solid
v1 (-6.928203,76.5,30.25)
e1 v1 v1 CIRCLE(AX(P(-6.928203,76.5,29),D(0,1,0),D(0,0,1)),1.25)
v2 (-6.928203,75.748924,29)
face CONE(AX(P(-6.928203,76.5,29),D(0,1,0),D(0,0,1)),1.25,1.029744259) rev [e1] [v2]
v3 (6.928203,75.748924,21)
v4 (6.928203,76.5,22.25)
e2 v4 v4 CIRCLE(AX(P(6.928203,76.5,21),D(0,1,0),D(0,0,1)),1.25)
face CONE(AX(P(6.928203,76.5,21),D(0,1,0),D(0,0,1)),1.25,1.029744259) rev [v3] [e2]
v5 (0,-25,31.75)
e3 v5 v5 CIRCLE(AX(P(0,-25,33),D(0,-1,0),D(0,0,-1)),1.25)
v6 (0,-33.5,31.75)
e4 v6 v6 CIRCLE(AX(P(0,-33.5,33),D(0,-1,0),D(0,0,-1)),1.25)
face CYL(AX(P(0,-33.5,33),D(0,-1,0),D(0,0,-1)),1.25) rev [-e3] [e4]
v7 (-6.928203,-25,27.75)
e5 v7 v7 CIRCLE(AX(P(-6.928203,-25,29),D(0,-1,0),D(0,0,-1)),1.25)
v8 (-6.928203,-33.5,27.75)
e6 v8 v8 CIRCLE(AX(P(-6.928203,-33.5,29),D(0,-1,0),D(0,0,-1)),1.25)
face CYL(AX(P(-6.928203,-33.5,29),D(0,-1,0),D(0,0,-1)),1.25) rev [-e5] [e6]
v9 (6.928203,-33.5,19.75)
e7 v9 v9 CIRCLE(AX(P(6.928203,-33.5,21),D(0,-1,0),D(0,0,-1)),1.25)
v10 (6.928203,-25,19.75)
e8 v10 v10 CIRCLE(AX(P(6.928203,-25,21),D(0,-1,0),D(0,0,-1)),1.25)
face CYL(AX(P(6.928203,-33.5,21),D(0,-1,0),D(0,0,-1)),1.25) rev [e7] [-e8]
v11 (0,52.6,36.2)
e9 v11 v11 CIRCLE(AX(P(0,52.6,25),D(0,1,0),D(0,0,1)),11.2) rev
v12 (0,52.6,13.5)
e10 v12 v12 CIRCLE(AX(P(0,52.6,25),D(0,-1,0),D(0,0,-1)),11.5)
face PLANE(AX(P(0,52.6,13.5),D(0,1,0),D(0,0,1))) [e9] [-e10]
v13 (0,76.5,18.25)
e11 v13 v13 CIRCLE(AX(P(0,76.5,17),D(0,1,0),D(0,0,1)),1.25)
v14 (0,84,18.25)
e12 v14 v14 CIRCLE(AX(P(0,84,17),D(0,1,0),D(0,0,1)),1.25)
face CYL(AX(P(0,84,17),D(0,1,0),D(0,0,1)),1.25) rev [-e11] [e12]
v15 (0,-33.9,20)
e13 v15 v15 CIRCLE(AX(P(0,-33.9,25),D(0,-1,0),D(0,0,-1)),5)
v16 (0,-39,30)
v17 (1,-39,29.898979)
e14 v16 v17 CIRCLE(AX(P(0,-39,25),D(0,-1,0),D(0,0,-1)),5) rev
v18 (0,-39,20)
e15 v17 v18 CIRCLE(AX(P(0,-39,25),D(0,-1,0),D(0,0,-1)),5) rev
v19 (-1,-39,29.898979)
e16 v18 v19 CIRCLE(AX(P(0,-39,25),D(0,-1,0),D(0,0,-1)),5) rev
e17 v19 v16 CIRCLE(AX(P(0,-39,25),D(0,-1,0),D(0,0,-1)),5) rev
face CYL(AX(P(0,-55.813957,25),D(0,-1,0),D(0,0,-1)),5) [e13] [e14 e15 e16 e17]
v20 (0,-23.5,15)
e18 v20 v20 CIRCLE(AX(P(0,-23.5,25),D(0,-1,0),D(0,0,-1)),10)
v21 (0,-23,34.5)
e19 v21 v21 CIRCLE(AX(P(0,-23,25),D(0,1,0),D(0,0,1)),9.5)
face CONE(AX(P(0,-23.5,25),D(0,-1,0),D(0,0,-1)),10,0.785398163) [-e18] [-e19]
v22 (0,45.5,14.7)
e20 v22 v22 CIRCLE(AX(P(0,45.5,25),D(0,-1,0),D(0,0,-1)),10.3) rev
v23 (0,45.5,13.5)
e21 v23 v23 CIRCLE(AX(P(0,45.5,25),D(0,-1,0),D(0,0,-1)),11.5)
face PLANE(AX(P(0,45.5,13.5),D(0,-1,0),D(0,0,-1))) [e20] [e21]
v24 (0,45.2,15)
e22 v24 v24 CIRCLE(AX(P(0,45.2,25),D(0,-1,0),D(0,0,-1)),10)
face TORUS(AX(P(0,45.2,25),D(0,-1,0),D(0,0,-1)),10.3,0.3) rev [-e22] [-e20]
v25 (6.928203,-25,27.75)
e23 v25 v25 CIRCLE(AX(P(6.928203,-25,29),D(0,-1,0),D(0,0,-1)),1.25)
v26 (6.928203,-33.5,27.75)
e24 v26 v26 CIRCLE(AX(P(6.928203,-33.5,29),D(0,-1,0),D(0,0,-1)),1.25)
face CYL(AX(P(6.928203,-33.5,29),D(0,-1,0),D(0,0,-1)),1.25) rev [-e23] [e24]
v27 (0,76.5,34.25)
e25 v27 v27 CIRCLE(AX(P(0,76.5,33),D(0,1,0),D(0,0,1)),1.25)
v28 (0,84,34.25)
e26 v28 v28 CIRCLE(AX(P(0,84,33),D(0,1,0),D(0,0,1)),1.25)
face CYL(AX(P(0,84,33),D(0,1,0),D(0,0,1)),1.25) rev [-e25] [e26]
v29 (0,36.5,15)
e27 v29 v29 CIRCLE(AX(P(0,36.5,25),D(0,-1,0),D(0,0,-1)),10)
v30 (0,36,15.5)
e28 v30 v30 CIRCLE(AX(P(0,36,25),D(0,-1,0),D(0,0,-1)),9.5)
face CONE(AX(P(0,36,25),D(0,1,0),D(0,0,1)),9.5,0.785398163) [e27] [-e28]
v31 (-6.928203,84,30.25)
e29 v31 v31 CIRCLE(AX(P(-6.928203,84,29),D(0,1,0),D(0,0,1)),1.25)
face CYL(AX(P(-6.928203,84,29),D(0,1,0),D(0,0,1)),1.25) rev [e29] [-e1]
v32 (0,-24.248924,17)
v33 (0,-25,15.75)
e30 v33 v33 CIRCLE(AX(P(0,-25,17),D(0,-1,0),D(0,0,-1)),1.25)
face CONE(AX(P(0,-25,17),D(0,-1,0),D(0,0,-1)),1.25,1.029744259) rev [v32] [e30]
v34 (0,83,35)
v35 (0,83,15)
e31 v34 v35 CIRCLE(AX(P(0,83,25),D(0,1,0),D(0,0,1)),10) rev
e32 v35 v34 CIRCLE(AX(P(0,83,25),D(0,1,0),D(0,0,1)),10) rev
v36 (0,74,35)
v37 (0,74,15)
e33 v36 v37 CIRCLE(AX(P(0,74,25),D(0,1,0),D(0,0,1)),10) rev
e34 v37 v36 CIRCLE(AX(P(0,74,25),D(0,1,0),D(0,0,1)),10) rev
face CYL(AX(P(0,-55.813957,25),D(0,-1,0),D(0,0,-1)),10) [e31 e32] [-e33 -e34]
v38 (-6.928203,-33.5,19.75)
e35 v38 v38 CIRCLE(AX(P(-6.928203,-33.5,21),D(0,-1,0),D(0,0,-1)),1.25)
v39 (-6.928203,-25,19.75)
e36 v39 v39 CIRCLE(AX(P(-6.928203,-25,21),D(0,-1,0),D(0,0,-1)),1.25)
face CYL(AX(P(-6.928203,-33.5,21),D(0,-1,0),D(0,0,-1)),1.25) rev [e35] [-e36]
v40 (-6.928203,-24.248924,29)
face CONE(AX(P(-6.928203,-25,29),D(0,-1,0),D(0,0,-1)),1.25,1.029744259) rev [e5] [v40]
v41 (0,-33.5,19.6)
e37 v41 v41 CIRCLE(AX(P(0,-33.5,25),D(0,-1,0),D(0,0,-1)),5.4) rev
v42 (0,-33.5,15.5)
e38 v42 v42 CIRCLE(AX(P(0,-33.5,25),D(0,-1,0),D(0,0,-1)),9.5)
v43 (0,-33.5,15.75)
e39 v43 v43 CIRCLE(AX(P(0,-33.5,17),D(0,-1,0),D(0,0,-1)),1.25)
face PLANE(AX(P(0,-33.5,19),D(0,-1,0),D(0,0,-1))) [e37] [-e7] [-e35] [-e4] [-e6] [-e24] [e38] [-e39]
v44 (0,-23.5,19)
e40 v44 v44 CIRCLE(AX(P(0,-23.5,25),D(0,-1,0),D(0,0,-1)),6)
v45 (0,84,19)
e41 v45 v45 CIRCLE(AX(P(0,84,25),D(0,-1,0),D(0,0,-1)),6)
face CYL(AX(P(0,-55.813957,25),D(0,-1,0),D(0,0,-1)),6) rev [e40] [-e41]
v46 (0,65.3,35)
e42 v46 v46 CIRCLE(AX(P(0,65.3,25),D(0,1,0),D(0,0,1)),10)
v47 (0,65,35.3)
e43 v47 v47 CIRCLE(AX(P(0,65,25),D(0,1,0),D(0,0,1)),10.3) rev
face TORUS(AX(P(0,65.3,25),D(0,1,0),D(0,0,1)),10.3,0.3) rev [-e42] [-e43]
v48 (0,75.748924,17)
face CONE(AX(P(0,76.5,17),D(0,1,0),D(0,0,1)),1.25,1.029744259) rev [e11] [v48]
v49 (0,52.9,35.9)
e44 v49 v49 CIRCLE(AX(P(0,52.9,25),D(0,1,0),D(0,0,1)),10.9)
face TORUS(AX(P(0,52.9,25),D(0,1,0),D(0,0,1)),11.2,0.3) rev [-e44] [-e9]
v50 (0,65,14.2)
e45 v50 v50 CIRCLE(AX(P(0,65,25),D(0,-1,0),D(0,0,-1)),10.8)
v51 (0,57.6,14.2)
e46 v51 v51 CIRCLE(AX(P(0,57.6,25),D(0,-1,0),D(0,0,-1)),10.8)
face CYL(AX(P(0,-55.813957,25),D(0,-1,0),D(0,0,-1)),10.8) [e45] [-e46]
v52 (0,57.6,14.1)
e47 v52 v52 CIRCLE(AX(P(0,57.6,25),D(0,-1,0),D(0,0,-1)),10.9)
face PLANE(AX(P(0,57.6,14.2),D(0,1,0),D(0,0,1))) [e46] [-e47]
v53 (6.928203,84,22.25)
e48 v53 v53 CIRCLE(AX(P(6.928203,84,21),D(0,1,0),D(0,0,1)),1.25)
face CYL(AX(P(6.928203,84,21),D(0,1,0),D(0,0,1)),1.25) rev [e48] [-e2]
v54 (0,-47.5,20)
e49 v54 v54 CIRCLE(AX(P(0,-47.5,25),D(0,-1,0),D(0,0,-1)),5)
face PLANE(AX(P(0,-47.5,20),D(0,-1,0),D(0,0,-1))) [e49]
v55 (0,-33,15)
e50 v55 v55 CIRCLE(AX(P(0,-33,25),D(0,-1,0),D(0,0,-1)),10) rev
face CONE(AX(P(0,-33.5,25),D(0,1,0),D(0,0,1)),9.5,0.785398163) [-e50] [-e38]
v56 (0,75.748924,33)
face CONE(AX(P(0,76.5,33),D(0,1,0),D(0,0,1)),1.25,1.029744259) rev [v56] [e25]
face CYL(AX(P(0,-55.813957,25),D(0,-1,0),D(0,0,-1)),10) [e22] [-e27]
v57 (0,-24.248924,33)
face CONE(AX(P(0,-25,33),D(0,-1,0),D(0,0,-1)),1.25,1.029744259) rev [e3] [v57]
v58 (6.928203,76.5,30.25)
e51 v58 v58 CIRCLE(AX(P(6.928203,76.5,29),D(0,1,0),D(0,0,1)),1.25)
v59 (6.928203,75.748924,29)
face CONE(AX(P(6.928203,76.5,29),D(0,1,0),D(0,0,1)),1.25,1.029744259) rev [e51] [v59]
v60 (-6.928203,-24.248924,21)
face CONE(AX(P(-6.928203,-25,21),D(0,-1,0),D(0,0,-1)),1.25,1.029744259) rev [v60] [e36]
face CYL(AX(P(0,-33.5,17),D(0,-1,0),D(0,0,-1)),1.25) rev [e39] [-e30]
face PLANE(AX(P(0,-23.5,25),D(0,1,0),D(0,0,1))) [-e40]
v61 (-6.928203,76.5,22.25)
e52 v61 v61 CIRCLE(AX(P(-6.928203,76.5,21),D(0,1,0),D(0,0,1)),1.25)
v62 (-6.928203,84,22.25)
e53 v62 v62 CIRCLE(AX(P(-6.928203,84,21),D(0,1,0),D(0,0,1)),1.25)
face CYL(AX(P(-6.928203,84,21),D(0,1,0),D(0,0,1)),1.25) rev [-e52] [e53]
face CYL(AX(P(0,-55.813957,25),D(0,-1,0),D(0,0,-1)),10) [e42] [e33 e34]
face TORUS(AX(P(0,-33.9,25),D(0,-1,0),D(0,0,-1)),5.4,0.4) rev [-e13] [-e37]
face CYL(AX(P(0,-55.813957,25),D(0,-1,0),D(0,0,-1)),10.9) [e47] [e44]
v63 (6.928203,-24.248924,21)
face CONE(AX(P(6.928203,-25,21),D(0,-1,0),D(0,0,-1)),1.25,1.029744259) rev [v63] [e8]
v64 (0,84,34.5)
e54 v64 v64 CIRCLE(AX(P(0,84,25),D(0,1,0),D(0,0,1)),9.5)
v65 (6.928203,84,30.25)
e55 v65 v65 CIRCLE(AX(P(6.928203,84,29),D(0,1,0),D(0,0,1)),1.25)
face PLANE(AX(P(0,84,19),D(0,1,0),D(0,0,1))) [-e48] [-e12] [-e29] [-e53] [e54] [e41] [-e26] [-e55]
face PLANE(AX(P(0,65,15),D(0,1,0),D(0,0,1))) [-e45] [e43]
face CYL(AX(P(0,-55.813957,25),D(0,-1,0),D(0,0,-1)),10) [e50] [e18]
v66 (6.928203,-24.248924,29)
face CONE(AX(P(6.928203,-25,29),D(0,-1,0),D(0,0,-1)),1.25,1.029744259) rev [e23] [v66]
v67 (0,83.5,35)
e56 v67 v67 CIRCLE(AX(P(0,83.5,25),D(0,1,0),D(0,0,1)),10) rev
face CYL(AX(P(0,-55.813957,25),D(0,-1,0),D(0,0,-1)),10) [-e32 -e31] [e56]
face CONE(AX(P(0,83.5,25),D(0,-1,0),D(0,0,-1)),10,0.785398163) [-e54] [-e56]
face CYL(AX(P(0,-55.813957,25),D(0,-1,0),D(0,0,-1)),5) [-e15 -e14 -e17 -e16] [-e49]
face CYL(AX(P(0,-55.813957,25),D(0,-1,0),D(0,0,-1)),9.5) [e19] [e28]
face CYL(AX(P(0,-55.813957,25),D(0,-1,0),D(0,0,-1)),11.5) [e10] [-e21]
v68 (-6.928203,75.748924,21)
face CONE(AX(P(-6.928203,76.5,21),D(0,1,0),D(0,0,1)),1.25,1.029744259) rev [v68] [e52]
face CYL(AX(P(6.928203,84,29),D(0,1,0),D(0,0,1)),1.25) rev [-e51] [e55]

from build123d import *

# Parameters (mm, degrees)
SKETCH4_W                     = 1.6
SKETCH4_H                     = 120
M3_CLEARANCE_HOLE1_AT_2_COUNT = 2
M3_CLEARANCE_HOLE1_AT_2_PITCH = 8
M3_CLEARANCE_HOLE1_AT_3_COUNT = 2
M3_CLEARANCE_HOLE1_AT_3_PITCH = 13.856406461
M3_CLEARANCE_HOLE1_AT_4_COUNT = 2
M3_CLEARANCE_HOLE1_AT_4_PITCH = 16
M3_CLEARANCE_HOLE1_AT_5_COUNT = 2
M3_CLEARANCE_HOLE1_AT_5_PITCH = 13.856406461
M3_CLEARANCE_HOLE1_AT_6_COUNT = 2
M3_CLEARANCE_HOLE1_AT_6_PITCH = 8
M3_TAPPED_HOLE1_AT_2_COUNT    = 2
M3_TAPPED_HOLE1_AT_2_PITCH    = 8
M3_TAPPED_HOLE1_AT_3_COUNT    = 2
M3_TAPPED_HOLE1_AT_3_PITCH    = 13.856406461
M3_TAPPED_HOLE1_AT_4_COUNT    = 2
M3_TAPPED_HOLE1_AT_4_PITCH    = 8
M3_TAPPED_HOLE1_AT_5_COUNT    = 2
M3_TAPPED_HOLE1_AT_5_PITCH    = 13.856406461
M3_TAPPED_HOLE1_AT_6_COUNT    = 2
M3_TAPPED_HOLE1_AT_6_PITCH    = 16
SKETCH15_W                    = 1.6
SKETCH15_H                    = 134
M3_CLEARANCE_HOLE2_AT_2_COUNT = 2
M3_CLEARANCE_HOLE2_AT_2_PITCH = 8
M3_CLEARANCE_HOLE2_AT_3_COUNT = 2
M3_CLEARANCE_HOLE2_AT_3_PITCH = 13.856406461
M3_CLEARANCE_HOLE2_AT_4_COUNT = 2
M3_CLEARANCE_HOLE2_AT_4_PITCH = 16
M3_CLEARANCE_HOLE2_AT_5_COUNT = 2
M3_CLEARANCE_HOLE2_AT_5_PITCH = 13.856406461
M3_CLEARANCE_HOLE2_AT_6_COUNT = 2
M3_CLEARANCE_HOLE2_AT_6_PITCH = 8
M3_TAPPED_HOLE2_AT_2_COUNT    = 2
M3_TAPPED_HOLE2_AT_2_PITCH    = 8
M3_TAPPED_HOLE2_AT_3_COUNT    = 2
M3_TAPPED_HOLE2_AT_3_PITCH    = 13.856406461
M3_TAPPED_HOLE2_AT_4_COUNT    = 2
M3_TAPPED_HOLE2_AT_4_PITCH    = 16
M3_TAPPED_HOLE2_AT_5_COUNT    = 2
M3_TAPPED_HOLE2_AT_5_PITCH    = 13.856406461
M3_TAPPED_HOLE2_AT_6_COUNT    = 2
M3_TAPPED_HOLE2_AT_6_PITCH    = 8
CHAMFER1_SIZE                 = 0.5
FILLET1_R                     = 0.3
FILLET2_R                     = 0.3
FILLET3_R                     = 0.4
CHAMFER2_SIZE                 = 0.5
FILLET4_R                     = 0.3
FILLET5_R                     = 0.3


with BuildPart() as part:
    # Sketch1 → Revolve1 (revolve)
    with BuildSketch(Plane(origin=(0, 0, 0), x_dir=(0, 0, -1), z_dir=(1, 0, 0))):
        Polygon((-15, 84), (-15, 65), (-14.2, 65), (-14.2, 57.6), (-14.1, 57.6), (-14.1, 52.6), (-13.5, 52.6), (-13.5, 45.5), (-15, 45.5), (-15, 36.5), (-15.5, 36.5), (-15.5, -23.5), (-15, -23.5), (-15, -33.5), (-19, -33.5), (-20, -33.5), (-20, -47.5), (-25, -47.5), (-25, -23.5), (-19, -23.5), (-19, 83), (-19, 84), align=None)
    revolve(axis=Axis((0, -55.813956753, 25), (0, 1, 0)))

    # Sketch8 → M3 Tapped Hole1 (revolve, cut)
    with BuildSketch(Plane(origin=(0, -33.5, 17), x_dir=(0, 0, -1), z_dir=(1, 0, 0))):
        Polygon((0, 0), (0, 9.251075774), (1.25, 8.5), (1.25, 0), align=None)
    m3_tapped_hole1 = revolve(axis=Axis((0, -39.85, 17), (0, 1, 0)), mode=Mode.SUBTRACT)

    # M3 Tapped Hole1 at 2: M3 Tapped Hole1 ×2
    with Locations(*[Vector(0.8660254037844389, 0, 0.4999999999999998) * (i * M3_TAPPED_HOLE1_AT_2_PITCH) for i in range(1, M3_TAPPED_HOLE1_AT_2_COUNT)]):
        add(m3_tapped_hole1, mode=Mode.SUBTRACT)

    # M3 Tapped Hole1 at 3: M3 Tapped Hole1 ×2
    with Locations(*[Vector(0.4999999999999999, 0, 0.8660254037844387) * (i * M3_TAPPED_HOLE1_AT_3_PITCH) for i in range(1, M3_TAPPED_HOLE1_AT_3_COUNT)]):
        add(m3_tapped_hole1, mode=Mode.SUBTRACT)

    # M3 Tapped Hole1 at 4: M3 Tapped Hole1 ×2
    with Locations(*[Vector(-0.8660254037844389, 0, 0.49999999999999956) * (i * M3_TAPPED_HOLE1_AT_4_PITCH) for i in range(1, M3_TAPPED_HOLE1_AT_4_COUNT)]):
        add(m3_tapped_hole1, mode=Mode.SUBTRACT)

    # M3 Tapped Hole1 at 5: M3 Tapped Hole1 ×2
    with Locations(*[Vector(-0.5000000000000003, 0, 0.8660254037844385) * (i * M3_TAPPED_HOLE1_AT_5_PITCH) for i in range(1, M3_TAPPED_HOLE1_AT_5_COUNT)]):
        add(m3_tapped_hole1, mode=Mode.SUBTRACT)

    # M3 Tapped Hole1 at 6: M3 Tapped Hole1 ×2
    with Locations(*[(0, 0, i * M3_TAPPED_HOLE1_AT_6_PITCH) for i in range(1, M3_TAPPED_HOLE1_AT_6_COUNT)]):
        add(m3_tapped_hole1, mode=Mode.SUBTRACT)

    # Sketch20 → M3 Tapped Hole2 (revolve, cut)
    with BuildSketch(Plane(origin=(-6.92820323, 84, 29), x_dir=(0, 0, 1), z_dir=(1, 0, 0))):
        Polygon((0, 0), (0, 8.251075774), (1.25, 7.5), (1.25, 0), align=None)
    m3_tapped_hole2 = revolve(axis=Axis((-6.92820323, 90.35, 29), (0, -1, 0)), mode=Mode.SUBTRACT)

    # M3 Tapped Hole2 at 2: M3 Tapped Hole2 ×2
    with Locations(*[Vector(0.8660254037844393, 0, 0.49999999999999906) * (i * M3_TAPPED_HOLE2_AT_2_PITCH) for i in range(1, M3_TAPPED_HOLE2_AT_2_COUNT)]):
        add(m3_tapped_hole2, mode=Mode.SUBTRACT)

    # M3 Tapped Hole2 at 3: M3 Tapped Hole2 ×2
    with Locations(*[(i * M3_TAPPED_HOLE2_AT_3_PITCH, 0, 0) for i in range(1, M3_TAPPED_HOLE2_AT_3_COUNT)]):
        add(m3_tapped_hole2, mode=Mode.SUBTRACT)

    # M3 Tapped Hole2 at 4: M3 Tapped Hole2 ×2
    with Locations(*[Vector(0.8660254037844384, 0, -0.5000000000000006) * (i * M3_TAPPED_HOLE2_AT_4_PITCH) for i in range(1, M3_TAPPED_HOLE2_AT_4_COUNT)]):
        add(m3_tapped_hole2, mode=Mode.SUBTRACT)

    # M3 Tapped Hole2 at 5: M3 Tapped Hole2 ×2
    with Locations(*[Vector(0.4999999999999996, 0, -0.8660254037844389) * (i * M3_TAPPED_HOLE2_AT_5_PITCH) for i in range(1, M3_TAPPED_HOLE2_AT_5_COUNT)]):
        add(m3_tapped_hole2, mode=Mode.SUBTRACT)

    # M3 Tapped Hole2 at 6: M3 Tapped Hole2 ×2
    with Locations(*[(0, 0, -i * M3_TAPPED_HOLE2_AT_6_PITCH) for i in range(1, M3_TAPPED_HOLE2_AT_6_COUNT)]):
        add(m3_tapped_hole2, mode=Mode.SUBTRACT)

    # Chamfer1
    chamfer1_edges = [part.edges().sort_by_distance(p)[0] for p in [
        (0, 84, 35),
        (0, -33.5, 35),
    ]]
    chamfer(chamfer1_edges, length=CHAMFER1_SIZE)

    # Fillet3
    fillet3_edges = [part.edges().sort_by_distance(p)[0] for p in [
        (0, -33.5, 30),
    ]]
    fillet(fillet3_edges, radius=FILLET3_R)

    # Chamfer2
    chamfer2_edges = [part.edges().sort_by_distance(p)[0] for p in [
        (0, -23.5, 34.5),
        (0, 36.5, 34.5),
    ]]
    chamfer(chamfer2_edges, length=CHAMFER2_SIZE - 0.0001)  # a hair under: the kernel refuses the full size

    # Fillet4
    fillet4_edges = [part.edges().sort_by_distance(p)[0] for p in [
        (0, 65, 35),
        (0, 45.5, 35),
    ]]
    fillet(fillet4_edges, radius=FILLET4_R)

    # Fillet5
    fillet5_edges = [part.edges().sort_by_distance(p)[0] for p in [
        (0, 52.6, 35.9),
    ]]
    fillet(fillet5_edges, radius=FILLET5_R)


with BuildPart() as body_2:
    # Sketch2 → Revolve2 (revolve)
    with BuildSketch(Plane(origin=(0, 0, 0), x_dir=(0, 0, -1), z_dir=(1, 0, 0))):
        Polygon((-19, -36), (-13, -36), (-13, -32.5), (-15, -32.5), (-15, -34), (-19, -34), align=None)
    revolve(axis=Axis((0, -55.813956753, 25), (0, 1, 0)))

    # Sketch4 → M3 Clearance Hole1 (revolve, cut)
    with BuildSketch(Plane(origin=(6.92820323, -36, 21), x_dir=(0, 0, -1), z_dir=(1, 0, 0))):
        with Locations((0.8, 60)):
            Rectangle(SKETCH4_W, SKETCH4_H)
    m3_clearance_hole1 = revolve(axis=Axis((6.92820323, -42.35, 21), (0, 1, 0)), mode=Mode.SUBTRACT)

    # M3 Clearance Hole1 at 2: M3 Clearance Hole1 ×2
    with Locations(*[Vector(-0.8660254037844389, 0, -0.4999999999999998) * (i * M3_CLEARANCE_HOLE1_AT_2_PITCH) for i in range(1, M3_CLEARANCE_HOLE1_AT_2_COUNT)]):
        add(m3_clearance_hole1, mode=Mode.SUBTRACT)

    # M3 Clearance Hole1 at 3: M3 Clearance Hole1 ×2
    with Locations(*[(-i * M3_CLEARANCE_HOLE1_AT_3_PITCH, 0, 0) for i in range(1, M3_CLEARANCE_HOLE1_AT_3_COUNT)]):
        add(m3_clearance_hole1, mode=Mode.SUBTRACT)

    # M3 Clearance Hole1 at 4: M3 Clearance Hole1 ×2
    with Locations(*[Vector(-0.8660254037844389, 0, 0.4999999999999996) * (i * M3_CLEARANCE_HOLE1_AT_4_PITCH) for i in range(1, M3_CLEARANCE_HOLE1_AT_4_COUNT)]):
        add(m3_clearance_hole1, mode=Mode.SUBTRACT)

    # M3 Clearance Hole1 at 5: M3 Clearance Hole1 ×2
    with Locations(*[Vector(-0.5000000000000004, 0, 0.8660254037844385) * (i * M3_CLEARANCE_HOLE1_AT_5_PITCH) for i in range(1, M3_CLEARANCE_HOLE1_AT_5_COUNT)]):
        add(m3_clearance_hole1, mode=Mode.SUBTRACT)

    # M3 Clearance Hole1 at 6: M3 Clearance Hole1 ×2
    with Locations(*[(0, 0, i * M3_CLEARANCE_HOLE1_AT_6_PITCH) for i in range(1, M3_CLEARANCE_HOLE1_AT_6_COUNT)]):
        add(m3_clearance_hole1, mode=Mode.SUBTRACT)

    # Fillet2
    fillet2_edges = [body_2.edges().sort_by_distance(p)[0] for p in [
        (0, -34, 35),
    ]]
    fillet(fillet2_edges, radius=FILLET2_R)


with BuildPart() as body_3:
    # Sketch13 → Revolve4 (revolve)
    with BuildSketch(Plane(origin=(0, 0, 0), x_dir=(0, 0, -1), z_dir=(1, 0, 0))):
        Polygon((-19, 86.5), (-13, 86.5), (-13, 83), (-15, 83), (-15, 84.5), (-19, 84.5), align=None)
    revolve(axis=Axis((0, -55.813956753, 25), (0, 1, 0)))

    # Sketch15 → M3 Clearance Hole2 (revolve, cut)
    with BuildSketch(Plane(origin=(-6.92820323, 86.5, 21), x_dir=(0, 0, 1), z_dir=(1, 0, 0))):
        with Locations((0.8, 67)):
            Rectangle(SKETCH15_W, SKETCH15_H)
    m3_clearance_hole2 = revolve(axis=Axis((-6.92820323, 92.85, 21), (0, -1, 0)), mode=Mode.SUBTRACT)

    # M3 Clearance Hole2 at 2: M3 Clearance Hole2 ×2
    with Locations(*[Vector(0.8660254037844392, 0, -0.49999999999999933) * (i * M3_CLEARANCE_HOLE2_AT_2_PITCH) for i in range(1, M3_CLEARANCE_HOLE2_AT_2_COUNT)]):
        add(m3_clearance_hole2, mode=Mode.SUBTRACT)

    # M3 Clearance Hole2 at 3: M3 Clearance Hole2 ×2
    with Locations(*[(i * M3_CLEARANCE_HOLE2_AT_3_PITCH, 0, 0) for i in range(1, M3_CLEARANCE_HOLE2_AT_3_COUNT)]):
        add(m3_clearance_hole2, mode=Mode.SUBTRACT)

    # M3 Clearance Hole2 at 4: M3 Clearance Hole2 ×2
    with Locations(*[Vector(0.8660254037844386, 0, 0.5000000000000003) * (i * M3_CLEARANCE_HOLE2_AT_4_PITCH) for i in range(1, M3_CLEARANCE_HOLE2_AT_4_COUNT)]):
        add(m3_clearance_hole2, mode=Mode.SUBTRACT)

    # M3 Clearance Hole2 at 5: M3 Clearance Hole2 ×2
    with Locations(*[Vector(0.4999999999999999, 0, 0.8660254037844387) * (i * M3_CLEARANCE_HOLE2_AT_5_PITCH) for i in range(1, M3_CLEARANCE_HOLE2_AT_5_COUNT)]):
        add(m3_clearance_hole2, mode=Mode.SUBTRACT)

    # M3 Clearance Hole2 at 6: M3 Clearance Hole2 ×2
    with Locations(*[(0, 0, i * M3_CLEARANCE_HOLE2_AT_6_PITCH) for i in range(1, M3_CLEARANCE_HOLE2_AT_6_COUNT)]):
        add(m3_clearance_hole2, mode=Mode.SUBTRACT)

    # Fillet1
    fillet1_edges = [body_3.edges().sort_by_distance(p)[0] for p in [
        (0, 84.5, 35),
    ]]
    fillet(fillet1_edges, radius=FILLET1_R)


solid = part.part
